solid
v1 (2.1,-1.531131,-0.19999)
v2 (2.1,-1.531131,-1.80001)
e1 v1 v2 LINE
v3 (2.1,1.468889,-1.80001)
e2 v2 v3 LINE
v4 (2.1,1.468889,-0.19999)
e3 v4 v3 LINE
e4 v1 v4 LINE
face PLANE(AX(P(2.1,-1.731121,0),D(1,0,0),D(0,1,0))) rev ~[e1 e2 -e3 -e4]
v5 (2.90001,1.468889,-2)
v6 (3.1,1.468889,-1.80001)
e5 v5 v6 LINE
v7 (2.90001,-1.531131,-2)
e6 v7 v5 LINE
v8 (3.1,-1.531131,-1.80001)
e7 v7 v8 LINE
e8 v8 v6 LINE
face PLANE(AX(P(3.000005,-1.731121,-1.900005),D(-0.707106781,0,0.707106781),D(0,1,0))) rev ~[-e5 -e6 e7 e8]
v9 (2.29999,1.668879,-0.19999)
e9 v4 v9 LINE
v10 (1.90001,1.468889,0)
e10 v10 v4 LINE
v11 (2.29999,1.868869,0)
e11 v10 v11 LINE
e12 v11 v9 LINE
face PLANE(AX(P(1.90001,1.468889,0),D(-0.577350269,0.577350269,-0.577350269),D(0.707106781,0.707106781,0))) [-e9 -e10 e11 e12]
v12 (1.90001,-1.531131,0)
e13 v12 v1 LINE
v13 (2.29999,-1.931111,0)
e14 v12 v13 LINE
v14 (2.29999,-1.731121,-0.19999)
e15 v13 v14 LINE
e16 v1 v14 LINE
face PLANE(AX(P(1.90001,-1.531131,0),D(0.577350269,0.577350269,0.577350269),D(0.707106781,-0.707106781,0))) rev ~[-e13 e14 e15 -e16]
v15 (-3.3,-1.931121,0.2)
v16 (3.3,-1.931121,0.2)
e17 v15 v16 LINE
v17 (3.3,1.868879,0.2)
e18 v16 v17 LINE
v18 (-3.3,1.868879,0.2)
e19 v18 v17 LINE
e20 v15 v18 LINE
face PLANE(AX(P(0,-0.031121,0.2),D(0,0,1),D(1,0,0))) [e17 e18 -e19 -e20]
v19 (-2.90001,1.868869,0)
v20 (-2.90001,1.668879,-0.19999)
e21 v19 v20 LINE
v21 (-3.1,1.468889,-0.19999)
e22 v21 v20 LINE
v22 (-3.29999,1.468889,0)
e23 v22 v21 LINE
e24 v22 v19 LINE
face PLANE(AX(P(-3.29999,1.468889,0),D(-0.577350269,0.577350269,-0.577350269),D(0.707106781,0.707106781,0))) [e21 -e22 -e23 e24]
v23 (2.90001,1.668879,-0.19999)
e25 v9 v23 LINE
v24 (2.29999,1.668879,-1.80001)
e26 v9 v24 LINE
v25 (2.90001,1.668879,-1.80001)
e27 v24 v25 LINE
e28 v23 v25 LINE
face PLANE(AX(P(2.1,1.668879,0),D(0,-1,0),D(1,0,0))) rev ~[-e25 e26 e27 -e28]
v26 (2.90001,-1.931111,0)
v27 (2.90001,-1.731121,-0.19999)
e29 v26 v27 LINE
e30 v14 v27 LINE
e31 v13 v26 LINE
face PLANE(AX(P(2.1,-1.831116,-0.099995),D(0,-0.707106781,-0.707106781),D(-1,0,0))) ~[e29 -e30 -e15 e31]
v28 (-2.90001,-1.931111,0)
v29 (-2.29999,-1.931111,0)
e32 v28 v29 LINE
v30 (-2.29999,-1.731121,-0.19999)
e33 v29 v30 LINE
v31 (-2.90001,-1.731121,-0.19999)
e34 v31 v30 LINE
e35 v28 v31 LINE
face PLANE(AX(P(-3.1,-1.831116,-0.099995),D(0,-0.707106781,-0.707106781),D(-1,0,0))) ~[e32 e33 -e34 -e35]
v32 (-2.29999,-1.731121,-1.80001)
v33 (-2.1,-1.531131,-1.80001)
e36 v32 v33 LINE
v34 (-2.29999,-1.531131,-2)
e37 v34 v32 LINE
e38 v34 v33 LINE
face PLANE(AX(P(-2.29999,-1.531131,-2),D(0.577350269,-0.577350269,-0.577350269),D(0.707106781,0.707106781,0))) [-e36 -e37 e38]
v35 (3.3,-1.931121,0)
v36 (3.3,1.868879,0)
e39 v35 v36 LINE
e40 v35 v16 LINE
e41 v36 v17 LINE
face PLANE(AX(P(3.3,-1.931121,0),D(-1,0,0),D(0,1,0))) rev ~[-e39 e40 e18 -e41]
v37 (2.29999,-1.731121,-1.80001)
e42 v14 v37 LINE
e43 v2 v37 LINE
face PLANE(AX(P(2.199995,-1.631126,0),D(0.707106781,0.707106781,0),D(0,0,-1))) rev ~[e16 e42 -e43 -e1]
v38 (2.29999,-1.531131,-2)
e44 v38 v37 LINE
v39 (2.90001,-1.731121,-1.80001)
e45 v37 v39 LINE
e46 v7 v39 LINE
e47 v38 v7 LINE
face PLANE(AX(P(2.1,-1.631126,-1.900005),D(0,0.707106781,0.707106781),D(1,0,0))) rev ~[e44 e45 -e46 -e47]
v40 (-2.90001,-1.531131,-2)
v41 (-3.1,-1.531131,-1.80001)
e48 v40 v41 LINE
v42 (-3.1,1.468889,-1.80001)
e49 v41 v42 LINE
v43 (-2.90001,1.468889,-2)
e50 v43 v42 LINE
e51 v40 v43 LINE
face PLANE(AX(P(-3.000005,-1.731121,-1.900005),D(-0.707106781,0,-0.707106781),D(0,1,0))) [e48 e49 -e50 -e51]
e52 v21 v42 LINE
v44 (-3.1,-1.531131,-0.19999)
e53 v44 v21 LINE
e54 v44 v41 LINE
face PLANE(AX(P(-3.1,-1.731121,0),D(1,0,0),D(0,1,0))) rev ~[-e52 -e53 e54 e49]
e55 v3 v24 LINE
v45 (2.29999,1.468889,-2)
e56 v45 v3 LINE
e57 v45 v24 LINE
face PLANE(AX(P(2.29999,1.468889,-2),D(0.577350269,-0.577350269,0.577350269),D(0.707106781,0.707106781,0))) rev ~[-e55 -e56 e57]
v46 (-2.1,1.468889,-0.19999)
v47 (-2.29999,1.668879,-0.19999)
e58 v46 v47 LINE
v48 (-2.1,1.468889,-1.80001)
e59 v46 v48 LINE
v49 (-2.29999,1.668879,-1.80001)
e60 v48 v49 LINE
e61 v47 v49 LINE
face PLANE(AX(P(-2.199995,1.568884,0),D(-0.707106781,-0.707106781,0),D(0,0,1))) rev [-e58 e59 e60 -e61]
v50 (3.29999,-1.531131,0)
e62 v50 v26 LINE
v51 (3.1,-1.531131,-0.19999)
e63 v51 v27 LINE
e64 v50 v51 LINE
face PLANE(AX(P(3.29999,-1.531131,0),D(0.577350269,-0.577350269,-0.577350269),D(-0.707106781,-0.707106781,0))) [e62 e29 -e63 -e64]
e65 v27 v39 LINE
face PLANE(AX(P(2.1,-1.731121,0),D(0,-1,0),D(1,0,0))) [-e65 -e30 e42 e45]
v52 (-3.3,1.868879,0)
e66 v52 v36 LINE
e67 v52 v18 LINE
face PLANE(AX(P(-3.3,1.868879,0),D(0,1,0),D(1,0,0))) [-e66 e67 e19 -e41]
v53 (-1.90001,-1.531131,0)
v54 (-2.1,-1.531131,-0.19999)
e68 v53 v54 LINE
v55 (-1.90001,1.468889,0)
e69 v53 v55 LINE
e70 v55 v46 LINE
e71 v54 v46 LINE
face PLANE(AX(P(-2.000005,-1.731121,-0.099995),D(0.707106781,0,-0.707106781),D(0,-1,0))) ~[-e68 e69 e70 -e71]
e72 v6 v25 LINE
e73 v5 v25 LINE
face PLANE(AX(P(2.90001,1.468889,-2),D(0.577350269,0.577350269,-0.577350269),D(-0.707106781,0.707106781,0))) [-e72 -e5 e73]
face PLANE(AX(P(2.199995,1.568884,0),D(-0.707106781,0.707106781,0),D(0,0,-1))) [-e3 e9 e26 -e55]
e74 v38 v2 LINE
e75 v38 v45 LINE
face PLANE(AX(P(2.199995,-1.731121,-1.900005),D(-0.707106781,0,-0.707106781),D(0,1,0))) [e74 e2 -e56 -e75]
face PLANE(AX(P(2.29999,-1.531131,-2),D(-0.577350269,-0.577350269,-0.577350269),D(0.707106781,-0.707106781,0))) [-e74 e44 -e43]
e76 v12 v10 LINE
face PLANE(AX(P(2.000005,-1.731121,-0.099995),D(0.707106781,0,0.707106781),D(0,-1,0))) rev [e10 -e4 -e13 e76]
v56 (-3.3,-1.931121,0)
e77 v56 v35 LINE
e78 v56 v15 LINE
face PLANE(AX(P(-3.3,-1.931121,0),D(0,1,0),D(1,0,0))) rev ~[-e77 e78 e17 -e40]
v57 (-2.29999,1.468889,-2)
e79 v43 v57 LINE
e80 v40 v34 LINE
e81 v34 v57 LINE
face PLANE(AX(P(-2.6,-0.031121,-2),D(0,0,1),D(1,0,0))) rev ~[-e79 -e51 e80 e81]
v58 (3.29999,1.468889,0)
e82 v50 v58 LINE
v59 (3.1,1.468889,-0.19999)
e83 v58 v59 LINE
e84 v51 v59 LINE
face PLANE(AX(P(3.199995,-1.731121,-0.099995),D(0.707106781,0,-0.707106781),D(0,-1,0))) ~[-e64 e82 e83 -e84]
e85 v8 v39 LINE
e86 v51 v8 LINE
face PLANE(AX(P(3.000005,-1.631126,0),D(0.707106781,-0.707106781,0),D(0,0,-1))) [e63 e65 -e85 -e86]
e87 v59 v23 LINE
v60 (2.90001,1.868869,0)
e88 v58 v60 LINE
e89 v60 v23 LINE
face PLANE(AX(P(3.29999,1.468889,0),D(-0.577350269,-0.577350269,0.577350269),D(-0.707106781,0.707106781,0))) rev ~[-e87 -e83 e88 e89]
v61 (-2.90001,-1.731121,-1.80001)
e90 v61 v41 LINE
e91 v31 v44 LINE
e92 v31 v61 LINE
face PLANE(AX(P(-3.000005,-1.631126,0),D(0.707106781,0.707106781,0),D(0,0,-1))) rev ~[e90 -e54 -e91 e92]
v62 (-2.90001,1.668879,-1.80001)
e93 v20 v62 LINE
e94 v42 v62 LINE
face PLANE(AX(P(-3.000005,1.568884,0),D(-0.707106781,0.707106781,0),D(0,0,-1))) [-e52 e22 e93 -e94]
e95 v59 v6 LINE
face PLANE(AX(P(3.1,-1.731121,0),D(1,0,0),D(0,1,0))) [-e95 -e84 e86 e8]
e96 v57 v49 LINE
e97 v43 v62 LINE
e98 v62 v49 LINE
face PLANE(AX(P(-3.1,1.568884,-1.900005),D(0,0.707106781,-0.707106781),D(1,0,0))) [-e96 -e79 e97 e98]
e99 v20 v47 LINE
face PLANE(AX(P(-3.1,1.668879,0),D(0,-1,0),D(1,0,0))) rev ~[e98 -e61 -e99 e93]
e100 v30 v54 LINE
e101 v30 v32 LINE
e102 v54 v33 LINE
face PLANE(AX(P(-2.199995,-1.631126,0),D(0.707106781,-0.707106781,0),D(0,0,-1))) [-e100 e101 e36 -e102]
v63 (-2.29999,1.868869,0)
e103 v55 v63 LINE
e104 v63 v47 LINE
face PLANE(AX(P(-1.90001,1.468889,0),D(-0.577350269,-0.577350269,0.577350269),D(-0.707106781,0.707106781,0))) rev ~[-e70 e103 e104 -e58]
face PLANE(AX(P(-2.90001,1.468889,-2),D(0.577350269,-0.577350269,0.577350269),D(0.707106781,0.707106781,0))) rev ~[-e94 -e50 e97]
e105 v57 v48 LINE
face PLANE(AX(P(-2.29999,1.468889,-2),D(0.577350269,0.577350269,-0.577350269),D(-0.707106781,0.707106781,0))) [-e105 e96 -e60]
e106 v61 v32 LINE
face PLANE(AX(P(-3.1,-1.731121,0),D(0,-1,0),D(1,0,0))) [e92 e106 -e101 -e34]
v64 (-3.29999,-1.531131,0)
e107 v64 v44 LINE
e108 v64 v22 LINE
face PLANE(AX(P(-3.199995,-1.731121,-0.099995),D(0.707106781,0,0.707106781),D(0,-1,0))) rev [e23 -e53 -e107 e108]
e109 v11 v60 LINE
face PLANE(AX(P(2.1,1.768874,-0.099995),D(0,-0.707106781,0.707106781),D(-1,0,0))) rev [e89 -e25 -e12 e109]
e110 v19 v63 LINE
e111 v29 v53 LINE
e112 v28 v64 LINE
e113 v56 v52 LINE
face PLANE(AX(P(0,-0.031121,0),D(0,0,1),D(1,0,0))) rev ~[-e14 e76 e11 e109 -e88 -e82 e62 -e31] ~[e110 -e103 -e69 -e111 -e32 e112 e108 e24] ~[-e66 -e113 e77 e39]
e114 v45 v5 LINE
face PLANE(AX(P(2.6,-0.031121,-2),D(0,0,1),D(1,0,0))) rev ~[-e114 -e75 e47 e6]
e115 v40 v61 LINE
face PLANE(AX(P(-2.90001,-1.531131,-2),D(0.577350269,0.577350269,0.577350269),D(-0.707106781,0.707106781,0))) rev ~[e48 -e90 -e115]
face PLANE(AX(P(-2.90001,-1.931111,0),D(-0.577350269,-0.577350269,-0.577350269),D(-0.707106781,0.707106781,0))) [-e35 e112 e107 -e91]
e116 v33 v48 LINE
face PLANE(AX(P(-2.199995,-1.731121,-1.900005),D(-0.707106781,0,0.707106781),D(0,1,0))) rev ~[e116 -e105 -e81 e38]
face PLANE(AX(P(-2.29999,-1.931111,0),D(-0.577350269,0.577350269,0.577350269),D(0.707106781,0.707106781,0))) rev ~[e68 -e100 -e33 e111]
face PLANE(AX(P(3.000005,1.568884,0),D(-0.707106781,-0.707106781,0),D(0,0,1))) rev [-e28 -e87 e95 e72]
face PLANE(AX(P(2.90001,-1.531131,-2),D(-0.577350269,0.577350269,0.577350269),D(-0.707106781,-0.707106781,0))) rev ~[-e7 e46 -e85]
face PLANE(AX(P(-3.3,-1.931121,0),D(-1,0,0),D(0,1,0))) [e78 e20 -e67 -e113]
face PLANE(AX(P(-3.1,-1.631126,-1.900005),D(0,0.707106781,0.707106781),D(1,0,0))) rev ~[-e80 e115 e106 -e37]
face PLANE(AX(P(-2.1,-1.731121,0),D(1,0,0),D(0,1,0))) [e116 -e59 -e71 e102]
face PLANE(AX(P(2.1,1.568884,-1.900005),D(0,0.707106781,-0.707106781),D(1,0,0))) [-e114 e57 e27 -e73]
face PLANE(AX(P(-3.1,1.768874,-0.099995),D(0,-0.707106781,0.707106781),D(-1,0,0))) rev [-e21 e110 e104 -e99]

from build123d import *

# Parameters (mm, degrees)
F1_W     = 6.6
F1_H     = 3.8
F1_W_2   = 1
F1_H_2   = 3.4
F3_DEPTH = 0.2
F4_DEPTH = 2
F5_SIZE  = 0.19999


# Not quite as in the source:
# - a fillet or chamfer is up to 0.001 mm smaller than in the source, because OpenCascade refuses the exact size
# - a feature names something its author has since deleted; it is built from what else it names


with BuildPart() as f3:
    # F1 (on Top) → F3 (new body)
    with BuildSketch(Plane.XY):
        with Locations((0, -0.0311205854)):
            Rectangle(F1_W, F1_H)
        with Locations((-2.6, -0.0311205854)):
            Rectangle(F1_W_2, F1_H_2, mode=Mode.SUBTRACT)
        with Locations((2.6, -0.0311205854)):
            Rectangle(F1_W_2, F1_H_2, mode=Mode.SUBTRACT)
        with Locations((-2.6, -0.0311205854)):
            Rectangle(F1_W_2, F1_H_2)
        with Locations((2.6, -0.0311205854)):
            Rectangle(F1_W_2, F1_H_2)
    extrude(amount=F3_DEPTH)

    # F1 (on Top) → F4 (join, through all)
    with BuildSketch(Plane.XY):
        with Locations((-2.6, -0.0311205854)):
            Rectangle(F1_W_2, F1_H_2)
        with Locations((2.6, -0.0311205854)):
            Rectangle(F1_W_2, F1_H_2)
    extrude(amount=-F4_DEPTH)

    # F5 (size 0.2 in the source; OpenCascade refuses exactly that, so slightly less here)
    f5_edges = [f3.edges().sort_by_distance(p)[0] for p in [
        (-3.1, -1.731121, -1),
        (-2.1, -1.731121, -1),
        (-2.6, -1.731121, 0),
        (-2.6, -1.731121, -2),
        (-3.1, 1.668879, -1),
        (-3.1, -0.031121, 0),
        (-3.1, -0.031121, -2),
        (-2.1, 1.668879, -1),
        (-2.1, -0.031121, 0),
        (-2.1, -0.031121, -2),
        (-2.6, 1.668879, 0),
        (-2.6, 1.668879, -2),
        (3.1, -1.731121, -1),
        (3.1, 1.668879, -1),
        (3.1, -0.031121, 0),
        (3.1, -0.031121, -2),
        (2.1, 1.668879, -1),
        (2.1, -1.731121, -1),
        (2.1, -0.031121, 0),
        (2.1, -0.031121, -2),
        (2.6, -1.731121, 0),
        (2.6, -1.731121, -2),
        (2.6, 1.668879, 0),
        (2.6, 1.668879, -2),
    ]]
    chamfer(f5_edges, length=F5_SIZE)


solid = f3.part
